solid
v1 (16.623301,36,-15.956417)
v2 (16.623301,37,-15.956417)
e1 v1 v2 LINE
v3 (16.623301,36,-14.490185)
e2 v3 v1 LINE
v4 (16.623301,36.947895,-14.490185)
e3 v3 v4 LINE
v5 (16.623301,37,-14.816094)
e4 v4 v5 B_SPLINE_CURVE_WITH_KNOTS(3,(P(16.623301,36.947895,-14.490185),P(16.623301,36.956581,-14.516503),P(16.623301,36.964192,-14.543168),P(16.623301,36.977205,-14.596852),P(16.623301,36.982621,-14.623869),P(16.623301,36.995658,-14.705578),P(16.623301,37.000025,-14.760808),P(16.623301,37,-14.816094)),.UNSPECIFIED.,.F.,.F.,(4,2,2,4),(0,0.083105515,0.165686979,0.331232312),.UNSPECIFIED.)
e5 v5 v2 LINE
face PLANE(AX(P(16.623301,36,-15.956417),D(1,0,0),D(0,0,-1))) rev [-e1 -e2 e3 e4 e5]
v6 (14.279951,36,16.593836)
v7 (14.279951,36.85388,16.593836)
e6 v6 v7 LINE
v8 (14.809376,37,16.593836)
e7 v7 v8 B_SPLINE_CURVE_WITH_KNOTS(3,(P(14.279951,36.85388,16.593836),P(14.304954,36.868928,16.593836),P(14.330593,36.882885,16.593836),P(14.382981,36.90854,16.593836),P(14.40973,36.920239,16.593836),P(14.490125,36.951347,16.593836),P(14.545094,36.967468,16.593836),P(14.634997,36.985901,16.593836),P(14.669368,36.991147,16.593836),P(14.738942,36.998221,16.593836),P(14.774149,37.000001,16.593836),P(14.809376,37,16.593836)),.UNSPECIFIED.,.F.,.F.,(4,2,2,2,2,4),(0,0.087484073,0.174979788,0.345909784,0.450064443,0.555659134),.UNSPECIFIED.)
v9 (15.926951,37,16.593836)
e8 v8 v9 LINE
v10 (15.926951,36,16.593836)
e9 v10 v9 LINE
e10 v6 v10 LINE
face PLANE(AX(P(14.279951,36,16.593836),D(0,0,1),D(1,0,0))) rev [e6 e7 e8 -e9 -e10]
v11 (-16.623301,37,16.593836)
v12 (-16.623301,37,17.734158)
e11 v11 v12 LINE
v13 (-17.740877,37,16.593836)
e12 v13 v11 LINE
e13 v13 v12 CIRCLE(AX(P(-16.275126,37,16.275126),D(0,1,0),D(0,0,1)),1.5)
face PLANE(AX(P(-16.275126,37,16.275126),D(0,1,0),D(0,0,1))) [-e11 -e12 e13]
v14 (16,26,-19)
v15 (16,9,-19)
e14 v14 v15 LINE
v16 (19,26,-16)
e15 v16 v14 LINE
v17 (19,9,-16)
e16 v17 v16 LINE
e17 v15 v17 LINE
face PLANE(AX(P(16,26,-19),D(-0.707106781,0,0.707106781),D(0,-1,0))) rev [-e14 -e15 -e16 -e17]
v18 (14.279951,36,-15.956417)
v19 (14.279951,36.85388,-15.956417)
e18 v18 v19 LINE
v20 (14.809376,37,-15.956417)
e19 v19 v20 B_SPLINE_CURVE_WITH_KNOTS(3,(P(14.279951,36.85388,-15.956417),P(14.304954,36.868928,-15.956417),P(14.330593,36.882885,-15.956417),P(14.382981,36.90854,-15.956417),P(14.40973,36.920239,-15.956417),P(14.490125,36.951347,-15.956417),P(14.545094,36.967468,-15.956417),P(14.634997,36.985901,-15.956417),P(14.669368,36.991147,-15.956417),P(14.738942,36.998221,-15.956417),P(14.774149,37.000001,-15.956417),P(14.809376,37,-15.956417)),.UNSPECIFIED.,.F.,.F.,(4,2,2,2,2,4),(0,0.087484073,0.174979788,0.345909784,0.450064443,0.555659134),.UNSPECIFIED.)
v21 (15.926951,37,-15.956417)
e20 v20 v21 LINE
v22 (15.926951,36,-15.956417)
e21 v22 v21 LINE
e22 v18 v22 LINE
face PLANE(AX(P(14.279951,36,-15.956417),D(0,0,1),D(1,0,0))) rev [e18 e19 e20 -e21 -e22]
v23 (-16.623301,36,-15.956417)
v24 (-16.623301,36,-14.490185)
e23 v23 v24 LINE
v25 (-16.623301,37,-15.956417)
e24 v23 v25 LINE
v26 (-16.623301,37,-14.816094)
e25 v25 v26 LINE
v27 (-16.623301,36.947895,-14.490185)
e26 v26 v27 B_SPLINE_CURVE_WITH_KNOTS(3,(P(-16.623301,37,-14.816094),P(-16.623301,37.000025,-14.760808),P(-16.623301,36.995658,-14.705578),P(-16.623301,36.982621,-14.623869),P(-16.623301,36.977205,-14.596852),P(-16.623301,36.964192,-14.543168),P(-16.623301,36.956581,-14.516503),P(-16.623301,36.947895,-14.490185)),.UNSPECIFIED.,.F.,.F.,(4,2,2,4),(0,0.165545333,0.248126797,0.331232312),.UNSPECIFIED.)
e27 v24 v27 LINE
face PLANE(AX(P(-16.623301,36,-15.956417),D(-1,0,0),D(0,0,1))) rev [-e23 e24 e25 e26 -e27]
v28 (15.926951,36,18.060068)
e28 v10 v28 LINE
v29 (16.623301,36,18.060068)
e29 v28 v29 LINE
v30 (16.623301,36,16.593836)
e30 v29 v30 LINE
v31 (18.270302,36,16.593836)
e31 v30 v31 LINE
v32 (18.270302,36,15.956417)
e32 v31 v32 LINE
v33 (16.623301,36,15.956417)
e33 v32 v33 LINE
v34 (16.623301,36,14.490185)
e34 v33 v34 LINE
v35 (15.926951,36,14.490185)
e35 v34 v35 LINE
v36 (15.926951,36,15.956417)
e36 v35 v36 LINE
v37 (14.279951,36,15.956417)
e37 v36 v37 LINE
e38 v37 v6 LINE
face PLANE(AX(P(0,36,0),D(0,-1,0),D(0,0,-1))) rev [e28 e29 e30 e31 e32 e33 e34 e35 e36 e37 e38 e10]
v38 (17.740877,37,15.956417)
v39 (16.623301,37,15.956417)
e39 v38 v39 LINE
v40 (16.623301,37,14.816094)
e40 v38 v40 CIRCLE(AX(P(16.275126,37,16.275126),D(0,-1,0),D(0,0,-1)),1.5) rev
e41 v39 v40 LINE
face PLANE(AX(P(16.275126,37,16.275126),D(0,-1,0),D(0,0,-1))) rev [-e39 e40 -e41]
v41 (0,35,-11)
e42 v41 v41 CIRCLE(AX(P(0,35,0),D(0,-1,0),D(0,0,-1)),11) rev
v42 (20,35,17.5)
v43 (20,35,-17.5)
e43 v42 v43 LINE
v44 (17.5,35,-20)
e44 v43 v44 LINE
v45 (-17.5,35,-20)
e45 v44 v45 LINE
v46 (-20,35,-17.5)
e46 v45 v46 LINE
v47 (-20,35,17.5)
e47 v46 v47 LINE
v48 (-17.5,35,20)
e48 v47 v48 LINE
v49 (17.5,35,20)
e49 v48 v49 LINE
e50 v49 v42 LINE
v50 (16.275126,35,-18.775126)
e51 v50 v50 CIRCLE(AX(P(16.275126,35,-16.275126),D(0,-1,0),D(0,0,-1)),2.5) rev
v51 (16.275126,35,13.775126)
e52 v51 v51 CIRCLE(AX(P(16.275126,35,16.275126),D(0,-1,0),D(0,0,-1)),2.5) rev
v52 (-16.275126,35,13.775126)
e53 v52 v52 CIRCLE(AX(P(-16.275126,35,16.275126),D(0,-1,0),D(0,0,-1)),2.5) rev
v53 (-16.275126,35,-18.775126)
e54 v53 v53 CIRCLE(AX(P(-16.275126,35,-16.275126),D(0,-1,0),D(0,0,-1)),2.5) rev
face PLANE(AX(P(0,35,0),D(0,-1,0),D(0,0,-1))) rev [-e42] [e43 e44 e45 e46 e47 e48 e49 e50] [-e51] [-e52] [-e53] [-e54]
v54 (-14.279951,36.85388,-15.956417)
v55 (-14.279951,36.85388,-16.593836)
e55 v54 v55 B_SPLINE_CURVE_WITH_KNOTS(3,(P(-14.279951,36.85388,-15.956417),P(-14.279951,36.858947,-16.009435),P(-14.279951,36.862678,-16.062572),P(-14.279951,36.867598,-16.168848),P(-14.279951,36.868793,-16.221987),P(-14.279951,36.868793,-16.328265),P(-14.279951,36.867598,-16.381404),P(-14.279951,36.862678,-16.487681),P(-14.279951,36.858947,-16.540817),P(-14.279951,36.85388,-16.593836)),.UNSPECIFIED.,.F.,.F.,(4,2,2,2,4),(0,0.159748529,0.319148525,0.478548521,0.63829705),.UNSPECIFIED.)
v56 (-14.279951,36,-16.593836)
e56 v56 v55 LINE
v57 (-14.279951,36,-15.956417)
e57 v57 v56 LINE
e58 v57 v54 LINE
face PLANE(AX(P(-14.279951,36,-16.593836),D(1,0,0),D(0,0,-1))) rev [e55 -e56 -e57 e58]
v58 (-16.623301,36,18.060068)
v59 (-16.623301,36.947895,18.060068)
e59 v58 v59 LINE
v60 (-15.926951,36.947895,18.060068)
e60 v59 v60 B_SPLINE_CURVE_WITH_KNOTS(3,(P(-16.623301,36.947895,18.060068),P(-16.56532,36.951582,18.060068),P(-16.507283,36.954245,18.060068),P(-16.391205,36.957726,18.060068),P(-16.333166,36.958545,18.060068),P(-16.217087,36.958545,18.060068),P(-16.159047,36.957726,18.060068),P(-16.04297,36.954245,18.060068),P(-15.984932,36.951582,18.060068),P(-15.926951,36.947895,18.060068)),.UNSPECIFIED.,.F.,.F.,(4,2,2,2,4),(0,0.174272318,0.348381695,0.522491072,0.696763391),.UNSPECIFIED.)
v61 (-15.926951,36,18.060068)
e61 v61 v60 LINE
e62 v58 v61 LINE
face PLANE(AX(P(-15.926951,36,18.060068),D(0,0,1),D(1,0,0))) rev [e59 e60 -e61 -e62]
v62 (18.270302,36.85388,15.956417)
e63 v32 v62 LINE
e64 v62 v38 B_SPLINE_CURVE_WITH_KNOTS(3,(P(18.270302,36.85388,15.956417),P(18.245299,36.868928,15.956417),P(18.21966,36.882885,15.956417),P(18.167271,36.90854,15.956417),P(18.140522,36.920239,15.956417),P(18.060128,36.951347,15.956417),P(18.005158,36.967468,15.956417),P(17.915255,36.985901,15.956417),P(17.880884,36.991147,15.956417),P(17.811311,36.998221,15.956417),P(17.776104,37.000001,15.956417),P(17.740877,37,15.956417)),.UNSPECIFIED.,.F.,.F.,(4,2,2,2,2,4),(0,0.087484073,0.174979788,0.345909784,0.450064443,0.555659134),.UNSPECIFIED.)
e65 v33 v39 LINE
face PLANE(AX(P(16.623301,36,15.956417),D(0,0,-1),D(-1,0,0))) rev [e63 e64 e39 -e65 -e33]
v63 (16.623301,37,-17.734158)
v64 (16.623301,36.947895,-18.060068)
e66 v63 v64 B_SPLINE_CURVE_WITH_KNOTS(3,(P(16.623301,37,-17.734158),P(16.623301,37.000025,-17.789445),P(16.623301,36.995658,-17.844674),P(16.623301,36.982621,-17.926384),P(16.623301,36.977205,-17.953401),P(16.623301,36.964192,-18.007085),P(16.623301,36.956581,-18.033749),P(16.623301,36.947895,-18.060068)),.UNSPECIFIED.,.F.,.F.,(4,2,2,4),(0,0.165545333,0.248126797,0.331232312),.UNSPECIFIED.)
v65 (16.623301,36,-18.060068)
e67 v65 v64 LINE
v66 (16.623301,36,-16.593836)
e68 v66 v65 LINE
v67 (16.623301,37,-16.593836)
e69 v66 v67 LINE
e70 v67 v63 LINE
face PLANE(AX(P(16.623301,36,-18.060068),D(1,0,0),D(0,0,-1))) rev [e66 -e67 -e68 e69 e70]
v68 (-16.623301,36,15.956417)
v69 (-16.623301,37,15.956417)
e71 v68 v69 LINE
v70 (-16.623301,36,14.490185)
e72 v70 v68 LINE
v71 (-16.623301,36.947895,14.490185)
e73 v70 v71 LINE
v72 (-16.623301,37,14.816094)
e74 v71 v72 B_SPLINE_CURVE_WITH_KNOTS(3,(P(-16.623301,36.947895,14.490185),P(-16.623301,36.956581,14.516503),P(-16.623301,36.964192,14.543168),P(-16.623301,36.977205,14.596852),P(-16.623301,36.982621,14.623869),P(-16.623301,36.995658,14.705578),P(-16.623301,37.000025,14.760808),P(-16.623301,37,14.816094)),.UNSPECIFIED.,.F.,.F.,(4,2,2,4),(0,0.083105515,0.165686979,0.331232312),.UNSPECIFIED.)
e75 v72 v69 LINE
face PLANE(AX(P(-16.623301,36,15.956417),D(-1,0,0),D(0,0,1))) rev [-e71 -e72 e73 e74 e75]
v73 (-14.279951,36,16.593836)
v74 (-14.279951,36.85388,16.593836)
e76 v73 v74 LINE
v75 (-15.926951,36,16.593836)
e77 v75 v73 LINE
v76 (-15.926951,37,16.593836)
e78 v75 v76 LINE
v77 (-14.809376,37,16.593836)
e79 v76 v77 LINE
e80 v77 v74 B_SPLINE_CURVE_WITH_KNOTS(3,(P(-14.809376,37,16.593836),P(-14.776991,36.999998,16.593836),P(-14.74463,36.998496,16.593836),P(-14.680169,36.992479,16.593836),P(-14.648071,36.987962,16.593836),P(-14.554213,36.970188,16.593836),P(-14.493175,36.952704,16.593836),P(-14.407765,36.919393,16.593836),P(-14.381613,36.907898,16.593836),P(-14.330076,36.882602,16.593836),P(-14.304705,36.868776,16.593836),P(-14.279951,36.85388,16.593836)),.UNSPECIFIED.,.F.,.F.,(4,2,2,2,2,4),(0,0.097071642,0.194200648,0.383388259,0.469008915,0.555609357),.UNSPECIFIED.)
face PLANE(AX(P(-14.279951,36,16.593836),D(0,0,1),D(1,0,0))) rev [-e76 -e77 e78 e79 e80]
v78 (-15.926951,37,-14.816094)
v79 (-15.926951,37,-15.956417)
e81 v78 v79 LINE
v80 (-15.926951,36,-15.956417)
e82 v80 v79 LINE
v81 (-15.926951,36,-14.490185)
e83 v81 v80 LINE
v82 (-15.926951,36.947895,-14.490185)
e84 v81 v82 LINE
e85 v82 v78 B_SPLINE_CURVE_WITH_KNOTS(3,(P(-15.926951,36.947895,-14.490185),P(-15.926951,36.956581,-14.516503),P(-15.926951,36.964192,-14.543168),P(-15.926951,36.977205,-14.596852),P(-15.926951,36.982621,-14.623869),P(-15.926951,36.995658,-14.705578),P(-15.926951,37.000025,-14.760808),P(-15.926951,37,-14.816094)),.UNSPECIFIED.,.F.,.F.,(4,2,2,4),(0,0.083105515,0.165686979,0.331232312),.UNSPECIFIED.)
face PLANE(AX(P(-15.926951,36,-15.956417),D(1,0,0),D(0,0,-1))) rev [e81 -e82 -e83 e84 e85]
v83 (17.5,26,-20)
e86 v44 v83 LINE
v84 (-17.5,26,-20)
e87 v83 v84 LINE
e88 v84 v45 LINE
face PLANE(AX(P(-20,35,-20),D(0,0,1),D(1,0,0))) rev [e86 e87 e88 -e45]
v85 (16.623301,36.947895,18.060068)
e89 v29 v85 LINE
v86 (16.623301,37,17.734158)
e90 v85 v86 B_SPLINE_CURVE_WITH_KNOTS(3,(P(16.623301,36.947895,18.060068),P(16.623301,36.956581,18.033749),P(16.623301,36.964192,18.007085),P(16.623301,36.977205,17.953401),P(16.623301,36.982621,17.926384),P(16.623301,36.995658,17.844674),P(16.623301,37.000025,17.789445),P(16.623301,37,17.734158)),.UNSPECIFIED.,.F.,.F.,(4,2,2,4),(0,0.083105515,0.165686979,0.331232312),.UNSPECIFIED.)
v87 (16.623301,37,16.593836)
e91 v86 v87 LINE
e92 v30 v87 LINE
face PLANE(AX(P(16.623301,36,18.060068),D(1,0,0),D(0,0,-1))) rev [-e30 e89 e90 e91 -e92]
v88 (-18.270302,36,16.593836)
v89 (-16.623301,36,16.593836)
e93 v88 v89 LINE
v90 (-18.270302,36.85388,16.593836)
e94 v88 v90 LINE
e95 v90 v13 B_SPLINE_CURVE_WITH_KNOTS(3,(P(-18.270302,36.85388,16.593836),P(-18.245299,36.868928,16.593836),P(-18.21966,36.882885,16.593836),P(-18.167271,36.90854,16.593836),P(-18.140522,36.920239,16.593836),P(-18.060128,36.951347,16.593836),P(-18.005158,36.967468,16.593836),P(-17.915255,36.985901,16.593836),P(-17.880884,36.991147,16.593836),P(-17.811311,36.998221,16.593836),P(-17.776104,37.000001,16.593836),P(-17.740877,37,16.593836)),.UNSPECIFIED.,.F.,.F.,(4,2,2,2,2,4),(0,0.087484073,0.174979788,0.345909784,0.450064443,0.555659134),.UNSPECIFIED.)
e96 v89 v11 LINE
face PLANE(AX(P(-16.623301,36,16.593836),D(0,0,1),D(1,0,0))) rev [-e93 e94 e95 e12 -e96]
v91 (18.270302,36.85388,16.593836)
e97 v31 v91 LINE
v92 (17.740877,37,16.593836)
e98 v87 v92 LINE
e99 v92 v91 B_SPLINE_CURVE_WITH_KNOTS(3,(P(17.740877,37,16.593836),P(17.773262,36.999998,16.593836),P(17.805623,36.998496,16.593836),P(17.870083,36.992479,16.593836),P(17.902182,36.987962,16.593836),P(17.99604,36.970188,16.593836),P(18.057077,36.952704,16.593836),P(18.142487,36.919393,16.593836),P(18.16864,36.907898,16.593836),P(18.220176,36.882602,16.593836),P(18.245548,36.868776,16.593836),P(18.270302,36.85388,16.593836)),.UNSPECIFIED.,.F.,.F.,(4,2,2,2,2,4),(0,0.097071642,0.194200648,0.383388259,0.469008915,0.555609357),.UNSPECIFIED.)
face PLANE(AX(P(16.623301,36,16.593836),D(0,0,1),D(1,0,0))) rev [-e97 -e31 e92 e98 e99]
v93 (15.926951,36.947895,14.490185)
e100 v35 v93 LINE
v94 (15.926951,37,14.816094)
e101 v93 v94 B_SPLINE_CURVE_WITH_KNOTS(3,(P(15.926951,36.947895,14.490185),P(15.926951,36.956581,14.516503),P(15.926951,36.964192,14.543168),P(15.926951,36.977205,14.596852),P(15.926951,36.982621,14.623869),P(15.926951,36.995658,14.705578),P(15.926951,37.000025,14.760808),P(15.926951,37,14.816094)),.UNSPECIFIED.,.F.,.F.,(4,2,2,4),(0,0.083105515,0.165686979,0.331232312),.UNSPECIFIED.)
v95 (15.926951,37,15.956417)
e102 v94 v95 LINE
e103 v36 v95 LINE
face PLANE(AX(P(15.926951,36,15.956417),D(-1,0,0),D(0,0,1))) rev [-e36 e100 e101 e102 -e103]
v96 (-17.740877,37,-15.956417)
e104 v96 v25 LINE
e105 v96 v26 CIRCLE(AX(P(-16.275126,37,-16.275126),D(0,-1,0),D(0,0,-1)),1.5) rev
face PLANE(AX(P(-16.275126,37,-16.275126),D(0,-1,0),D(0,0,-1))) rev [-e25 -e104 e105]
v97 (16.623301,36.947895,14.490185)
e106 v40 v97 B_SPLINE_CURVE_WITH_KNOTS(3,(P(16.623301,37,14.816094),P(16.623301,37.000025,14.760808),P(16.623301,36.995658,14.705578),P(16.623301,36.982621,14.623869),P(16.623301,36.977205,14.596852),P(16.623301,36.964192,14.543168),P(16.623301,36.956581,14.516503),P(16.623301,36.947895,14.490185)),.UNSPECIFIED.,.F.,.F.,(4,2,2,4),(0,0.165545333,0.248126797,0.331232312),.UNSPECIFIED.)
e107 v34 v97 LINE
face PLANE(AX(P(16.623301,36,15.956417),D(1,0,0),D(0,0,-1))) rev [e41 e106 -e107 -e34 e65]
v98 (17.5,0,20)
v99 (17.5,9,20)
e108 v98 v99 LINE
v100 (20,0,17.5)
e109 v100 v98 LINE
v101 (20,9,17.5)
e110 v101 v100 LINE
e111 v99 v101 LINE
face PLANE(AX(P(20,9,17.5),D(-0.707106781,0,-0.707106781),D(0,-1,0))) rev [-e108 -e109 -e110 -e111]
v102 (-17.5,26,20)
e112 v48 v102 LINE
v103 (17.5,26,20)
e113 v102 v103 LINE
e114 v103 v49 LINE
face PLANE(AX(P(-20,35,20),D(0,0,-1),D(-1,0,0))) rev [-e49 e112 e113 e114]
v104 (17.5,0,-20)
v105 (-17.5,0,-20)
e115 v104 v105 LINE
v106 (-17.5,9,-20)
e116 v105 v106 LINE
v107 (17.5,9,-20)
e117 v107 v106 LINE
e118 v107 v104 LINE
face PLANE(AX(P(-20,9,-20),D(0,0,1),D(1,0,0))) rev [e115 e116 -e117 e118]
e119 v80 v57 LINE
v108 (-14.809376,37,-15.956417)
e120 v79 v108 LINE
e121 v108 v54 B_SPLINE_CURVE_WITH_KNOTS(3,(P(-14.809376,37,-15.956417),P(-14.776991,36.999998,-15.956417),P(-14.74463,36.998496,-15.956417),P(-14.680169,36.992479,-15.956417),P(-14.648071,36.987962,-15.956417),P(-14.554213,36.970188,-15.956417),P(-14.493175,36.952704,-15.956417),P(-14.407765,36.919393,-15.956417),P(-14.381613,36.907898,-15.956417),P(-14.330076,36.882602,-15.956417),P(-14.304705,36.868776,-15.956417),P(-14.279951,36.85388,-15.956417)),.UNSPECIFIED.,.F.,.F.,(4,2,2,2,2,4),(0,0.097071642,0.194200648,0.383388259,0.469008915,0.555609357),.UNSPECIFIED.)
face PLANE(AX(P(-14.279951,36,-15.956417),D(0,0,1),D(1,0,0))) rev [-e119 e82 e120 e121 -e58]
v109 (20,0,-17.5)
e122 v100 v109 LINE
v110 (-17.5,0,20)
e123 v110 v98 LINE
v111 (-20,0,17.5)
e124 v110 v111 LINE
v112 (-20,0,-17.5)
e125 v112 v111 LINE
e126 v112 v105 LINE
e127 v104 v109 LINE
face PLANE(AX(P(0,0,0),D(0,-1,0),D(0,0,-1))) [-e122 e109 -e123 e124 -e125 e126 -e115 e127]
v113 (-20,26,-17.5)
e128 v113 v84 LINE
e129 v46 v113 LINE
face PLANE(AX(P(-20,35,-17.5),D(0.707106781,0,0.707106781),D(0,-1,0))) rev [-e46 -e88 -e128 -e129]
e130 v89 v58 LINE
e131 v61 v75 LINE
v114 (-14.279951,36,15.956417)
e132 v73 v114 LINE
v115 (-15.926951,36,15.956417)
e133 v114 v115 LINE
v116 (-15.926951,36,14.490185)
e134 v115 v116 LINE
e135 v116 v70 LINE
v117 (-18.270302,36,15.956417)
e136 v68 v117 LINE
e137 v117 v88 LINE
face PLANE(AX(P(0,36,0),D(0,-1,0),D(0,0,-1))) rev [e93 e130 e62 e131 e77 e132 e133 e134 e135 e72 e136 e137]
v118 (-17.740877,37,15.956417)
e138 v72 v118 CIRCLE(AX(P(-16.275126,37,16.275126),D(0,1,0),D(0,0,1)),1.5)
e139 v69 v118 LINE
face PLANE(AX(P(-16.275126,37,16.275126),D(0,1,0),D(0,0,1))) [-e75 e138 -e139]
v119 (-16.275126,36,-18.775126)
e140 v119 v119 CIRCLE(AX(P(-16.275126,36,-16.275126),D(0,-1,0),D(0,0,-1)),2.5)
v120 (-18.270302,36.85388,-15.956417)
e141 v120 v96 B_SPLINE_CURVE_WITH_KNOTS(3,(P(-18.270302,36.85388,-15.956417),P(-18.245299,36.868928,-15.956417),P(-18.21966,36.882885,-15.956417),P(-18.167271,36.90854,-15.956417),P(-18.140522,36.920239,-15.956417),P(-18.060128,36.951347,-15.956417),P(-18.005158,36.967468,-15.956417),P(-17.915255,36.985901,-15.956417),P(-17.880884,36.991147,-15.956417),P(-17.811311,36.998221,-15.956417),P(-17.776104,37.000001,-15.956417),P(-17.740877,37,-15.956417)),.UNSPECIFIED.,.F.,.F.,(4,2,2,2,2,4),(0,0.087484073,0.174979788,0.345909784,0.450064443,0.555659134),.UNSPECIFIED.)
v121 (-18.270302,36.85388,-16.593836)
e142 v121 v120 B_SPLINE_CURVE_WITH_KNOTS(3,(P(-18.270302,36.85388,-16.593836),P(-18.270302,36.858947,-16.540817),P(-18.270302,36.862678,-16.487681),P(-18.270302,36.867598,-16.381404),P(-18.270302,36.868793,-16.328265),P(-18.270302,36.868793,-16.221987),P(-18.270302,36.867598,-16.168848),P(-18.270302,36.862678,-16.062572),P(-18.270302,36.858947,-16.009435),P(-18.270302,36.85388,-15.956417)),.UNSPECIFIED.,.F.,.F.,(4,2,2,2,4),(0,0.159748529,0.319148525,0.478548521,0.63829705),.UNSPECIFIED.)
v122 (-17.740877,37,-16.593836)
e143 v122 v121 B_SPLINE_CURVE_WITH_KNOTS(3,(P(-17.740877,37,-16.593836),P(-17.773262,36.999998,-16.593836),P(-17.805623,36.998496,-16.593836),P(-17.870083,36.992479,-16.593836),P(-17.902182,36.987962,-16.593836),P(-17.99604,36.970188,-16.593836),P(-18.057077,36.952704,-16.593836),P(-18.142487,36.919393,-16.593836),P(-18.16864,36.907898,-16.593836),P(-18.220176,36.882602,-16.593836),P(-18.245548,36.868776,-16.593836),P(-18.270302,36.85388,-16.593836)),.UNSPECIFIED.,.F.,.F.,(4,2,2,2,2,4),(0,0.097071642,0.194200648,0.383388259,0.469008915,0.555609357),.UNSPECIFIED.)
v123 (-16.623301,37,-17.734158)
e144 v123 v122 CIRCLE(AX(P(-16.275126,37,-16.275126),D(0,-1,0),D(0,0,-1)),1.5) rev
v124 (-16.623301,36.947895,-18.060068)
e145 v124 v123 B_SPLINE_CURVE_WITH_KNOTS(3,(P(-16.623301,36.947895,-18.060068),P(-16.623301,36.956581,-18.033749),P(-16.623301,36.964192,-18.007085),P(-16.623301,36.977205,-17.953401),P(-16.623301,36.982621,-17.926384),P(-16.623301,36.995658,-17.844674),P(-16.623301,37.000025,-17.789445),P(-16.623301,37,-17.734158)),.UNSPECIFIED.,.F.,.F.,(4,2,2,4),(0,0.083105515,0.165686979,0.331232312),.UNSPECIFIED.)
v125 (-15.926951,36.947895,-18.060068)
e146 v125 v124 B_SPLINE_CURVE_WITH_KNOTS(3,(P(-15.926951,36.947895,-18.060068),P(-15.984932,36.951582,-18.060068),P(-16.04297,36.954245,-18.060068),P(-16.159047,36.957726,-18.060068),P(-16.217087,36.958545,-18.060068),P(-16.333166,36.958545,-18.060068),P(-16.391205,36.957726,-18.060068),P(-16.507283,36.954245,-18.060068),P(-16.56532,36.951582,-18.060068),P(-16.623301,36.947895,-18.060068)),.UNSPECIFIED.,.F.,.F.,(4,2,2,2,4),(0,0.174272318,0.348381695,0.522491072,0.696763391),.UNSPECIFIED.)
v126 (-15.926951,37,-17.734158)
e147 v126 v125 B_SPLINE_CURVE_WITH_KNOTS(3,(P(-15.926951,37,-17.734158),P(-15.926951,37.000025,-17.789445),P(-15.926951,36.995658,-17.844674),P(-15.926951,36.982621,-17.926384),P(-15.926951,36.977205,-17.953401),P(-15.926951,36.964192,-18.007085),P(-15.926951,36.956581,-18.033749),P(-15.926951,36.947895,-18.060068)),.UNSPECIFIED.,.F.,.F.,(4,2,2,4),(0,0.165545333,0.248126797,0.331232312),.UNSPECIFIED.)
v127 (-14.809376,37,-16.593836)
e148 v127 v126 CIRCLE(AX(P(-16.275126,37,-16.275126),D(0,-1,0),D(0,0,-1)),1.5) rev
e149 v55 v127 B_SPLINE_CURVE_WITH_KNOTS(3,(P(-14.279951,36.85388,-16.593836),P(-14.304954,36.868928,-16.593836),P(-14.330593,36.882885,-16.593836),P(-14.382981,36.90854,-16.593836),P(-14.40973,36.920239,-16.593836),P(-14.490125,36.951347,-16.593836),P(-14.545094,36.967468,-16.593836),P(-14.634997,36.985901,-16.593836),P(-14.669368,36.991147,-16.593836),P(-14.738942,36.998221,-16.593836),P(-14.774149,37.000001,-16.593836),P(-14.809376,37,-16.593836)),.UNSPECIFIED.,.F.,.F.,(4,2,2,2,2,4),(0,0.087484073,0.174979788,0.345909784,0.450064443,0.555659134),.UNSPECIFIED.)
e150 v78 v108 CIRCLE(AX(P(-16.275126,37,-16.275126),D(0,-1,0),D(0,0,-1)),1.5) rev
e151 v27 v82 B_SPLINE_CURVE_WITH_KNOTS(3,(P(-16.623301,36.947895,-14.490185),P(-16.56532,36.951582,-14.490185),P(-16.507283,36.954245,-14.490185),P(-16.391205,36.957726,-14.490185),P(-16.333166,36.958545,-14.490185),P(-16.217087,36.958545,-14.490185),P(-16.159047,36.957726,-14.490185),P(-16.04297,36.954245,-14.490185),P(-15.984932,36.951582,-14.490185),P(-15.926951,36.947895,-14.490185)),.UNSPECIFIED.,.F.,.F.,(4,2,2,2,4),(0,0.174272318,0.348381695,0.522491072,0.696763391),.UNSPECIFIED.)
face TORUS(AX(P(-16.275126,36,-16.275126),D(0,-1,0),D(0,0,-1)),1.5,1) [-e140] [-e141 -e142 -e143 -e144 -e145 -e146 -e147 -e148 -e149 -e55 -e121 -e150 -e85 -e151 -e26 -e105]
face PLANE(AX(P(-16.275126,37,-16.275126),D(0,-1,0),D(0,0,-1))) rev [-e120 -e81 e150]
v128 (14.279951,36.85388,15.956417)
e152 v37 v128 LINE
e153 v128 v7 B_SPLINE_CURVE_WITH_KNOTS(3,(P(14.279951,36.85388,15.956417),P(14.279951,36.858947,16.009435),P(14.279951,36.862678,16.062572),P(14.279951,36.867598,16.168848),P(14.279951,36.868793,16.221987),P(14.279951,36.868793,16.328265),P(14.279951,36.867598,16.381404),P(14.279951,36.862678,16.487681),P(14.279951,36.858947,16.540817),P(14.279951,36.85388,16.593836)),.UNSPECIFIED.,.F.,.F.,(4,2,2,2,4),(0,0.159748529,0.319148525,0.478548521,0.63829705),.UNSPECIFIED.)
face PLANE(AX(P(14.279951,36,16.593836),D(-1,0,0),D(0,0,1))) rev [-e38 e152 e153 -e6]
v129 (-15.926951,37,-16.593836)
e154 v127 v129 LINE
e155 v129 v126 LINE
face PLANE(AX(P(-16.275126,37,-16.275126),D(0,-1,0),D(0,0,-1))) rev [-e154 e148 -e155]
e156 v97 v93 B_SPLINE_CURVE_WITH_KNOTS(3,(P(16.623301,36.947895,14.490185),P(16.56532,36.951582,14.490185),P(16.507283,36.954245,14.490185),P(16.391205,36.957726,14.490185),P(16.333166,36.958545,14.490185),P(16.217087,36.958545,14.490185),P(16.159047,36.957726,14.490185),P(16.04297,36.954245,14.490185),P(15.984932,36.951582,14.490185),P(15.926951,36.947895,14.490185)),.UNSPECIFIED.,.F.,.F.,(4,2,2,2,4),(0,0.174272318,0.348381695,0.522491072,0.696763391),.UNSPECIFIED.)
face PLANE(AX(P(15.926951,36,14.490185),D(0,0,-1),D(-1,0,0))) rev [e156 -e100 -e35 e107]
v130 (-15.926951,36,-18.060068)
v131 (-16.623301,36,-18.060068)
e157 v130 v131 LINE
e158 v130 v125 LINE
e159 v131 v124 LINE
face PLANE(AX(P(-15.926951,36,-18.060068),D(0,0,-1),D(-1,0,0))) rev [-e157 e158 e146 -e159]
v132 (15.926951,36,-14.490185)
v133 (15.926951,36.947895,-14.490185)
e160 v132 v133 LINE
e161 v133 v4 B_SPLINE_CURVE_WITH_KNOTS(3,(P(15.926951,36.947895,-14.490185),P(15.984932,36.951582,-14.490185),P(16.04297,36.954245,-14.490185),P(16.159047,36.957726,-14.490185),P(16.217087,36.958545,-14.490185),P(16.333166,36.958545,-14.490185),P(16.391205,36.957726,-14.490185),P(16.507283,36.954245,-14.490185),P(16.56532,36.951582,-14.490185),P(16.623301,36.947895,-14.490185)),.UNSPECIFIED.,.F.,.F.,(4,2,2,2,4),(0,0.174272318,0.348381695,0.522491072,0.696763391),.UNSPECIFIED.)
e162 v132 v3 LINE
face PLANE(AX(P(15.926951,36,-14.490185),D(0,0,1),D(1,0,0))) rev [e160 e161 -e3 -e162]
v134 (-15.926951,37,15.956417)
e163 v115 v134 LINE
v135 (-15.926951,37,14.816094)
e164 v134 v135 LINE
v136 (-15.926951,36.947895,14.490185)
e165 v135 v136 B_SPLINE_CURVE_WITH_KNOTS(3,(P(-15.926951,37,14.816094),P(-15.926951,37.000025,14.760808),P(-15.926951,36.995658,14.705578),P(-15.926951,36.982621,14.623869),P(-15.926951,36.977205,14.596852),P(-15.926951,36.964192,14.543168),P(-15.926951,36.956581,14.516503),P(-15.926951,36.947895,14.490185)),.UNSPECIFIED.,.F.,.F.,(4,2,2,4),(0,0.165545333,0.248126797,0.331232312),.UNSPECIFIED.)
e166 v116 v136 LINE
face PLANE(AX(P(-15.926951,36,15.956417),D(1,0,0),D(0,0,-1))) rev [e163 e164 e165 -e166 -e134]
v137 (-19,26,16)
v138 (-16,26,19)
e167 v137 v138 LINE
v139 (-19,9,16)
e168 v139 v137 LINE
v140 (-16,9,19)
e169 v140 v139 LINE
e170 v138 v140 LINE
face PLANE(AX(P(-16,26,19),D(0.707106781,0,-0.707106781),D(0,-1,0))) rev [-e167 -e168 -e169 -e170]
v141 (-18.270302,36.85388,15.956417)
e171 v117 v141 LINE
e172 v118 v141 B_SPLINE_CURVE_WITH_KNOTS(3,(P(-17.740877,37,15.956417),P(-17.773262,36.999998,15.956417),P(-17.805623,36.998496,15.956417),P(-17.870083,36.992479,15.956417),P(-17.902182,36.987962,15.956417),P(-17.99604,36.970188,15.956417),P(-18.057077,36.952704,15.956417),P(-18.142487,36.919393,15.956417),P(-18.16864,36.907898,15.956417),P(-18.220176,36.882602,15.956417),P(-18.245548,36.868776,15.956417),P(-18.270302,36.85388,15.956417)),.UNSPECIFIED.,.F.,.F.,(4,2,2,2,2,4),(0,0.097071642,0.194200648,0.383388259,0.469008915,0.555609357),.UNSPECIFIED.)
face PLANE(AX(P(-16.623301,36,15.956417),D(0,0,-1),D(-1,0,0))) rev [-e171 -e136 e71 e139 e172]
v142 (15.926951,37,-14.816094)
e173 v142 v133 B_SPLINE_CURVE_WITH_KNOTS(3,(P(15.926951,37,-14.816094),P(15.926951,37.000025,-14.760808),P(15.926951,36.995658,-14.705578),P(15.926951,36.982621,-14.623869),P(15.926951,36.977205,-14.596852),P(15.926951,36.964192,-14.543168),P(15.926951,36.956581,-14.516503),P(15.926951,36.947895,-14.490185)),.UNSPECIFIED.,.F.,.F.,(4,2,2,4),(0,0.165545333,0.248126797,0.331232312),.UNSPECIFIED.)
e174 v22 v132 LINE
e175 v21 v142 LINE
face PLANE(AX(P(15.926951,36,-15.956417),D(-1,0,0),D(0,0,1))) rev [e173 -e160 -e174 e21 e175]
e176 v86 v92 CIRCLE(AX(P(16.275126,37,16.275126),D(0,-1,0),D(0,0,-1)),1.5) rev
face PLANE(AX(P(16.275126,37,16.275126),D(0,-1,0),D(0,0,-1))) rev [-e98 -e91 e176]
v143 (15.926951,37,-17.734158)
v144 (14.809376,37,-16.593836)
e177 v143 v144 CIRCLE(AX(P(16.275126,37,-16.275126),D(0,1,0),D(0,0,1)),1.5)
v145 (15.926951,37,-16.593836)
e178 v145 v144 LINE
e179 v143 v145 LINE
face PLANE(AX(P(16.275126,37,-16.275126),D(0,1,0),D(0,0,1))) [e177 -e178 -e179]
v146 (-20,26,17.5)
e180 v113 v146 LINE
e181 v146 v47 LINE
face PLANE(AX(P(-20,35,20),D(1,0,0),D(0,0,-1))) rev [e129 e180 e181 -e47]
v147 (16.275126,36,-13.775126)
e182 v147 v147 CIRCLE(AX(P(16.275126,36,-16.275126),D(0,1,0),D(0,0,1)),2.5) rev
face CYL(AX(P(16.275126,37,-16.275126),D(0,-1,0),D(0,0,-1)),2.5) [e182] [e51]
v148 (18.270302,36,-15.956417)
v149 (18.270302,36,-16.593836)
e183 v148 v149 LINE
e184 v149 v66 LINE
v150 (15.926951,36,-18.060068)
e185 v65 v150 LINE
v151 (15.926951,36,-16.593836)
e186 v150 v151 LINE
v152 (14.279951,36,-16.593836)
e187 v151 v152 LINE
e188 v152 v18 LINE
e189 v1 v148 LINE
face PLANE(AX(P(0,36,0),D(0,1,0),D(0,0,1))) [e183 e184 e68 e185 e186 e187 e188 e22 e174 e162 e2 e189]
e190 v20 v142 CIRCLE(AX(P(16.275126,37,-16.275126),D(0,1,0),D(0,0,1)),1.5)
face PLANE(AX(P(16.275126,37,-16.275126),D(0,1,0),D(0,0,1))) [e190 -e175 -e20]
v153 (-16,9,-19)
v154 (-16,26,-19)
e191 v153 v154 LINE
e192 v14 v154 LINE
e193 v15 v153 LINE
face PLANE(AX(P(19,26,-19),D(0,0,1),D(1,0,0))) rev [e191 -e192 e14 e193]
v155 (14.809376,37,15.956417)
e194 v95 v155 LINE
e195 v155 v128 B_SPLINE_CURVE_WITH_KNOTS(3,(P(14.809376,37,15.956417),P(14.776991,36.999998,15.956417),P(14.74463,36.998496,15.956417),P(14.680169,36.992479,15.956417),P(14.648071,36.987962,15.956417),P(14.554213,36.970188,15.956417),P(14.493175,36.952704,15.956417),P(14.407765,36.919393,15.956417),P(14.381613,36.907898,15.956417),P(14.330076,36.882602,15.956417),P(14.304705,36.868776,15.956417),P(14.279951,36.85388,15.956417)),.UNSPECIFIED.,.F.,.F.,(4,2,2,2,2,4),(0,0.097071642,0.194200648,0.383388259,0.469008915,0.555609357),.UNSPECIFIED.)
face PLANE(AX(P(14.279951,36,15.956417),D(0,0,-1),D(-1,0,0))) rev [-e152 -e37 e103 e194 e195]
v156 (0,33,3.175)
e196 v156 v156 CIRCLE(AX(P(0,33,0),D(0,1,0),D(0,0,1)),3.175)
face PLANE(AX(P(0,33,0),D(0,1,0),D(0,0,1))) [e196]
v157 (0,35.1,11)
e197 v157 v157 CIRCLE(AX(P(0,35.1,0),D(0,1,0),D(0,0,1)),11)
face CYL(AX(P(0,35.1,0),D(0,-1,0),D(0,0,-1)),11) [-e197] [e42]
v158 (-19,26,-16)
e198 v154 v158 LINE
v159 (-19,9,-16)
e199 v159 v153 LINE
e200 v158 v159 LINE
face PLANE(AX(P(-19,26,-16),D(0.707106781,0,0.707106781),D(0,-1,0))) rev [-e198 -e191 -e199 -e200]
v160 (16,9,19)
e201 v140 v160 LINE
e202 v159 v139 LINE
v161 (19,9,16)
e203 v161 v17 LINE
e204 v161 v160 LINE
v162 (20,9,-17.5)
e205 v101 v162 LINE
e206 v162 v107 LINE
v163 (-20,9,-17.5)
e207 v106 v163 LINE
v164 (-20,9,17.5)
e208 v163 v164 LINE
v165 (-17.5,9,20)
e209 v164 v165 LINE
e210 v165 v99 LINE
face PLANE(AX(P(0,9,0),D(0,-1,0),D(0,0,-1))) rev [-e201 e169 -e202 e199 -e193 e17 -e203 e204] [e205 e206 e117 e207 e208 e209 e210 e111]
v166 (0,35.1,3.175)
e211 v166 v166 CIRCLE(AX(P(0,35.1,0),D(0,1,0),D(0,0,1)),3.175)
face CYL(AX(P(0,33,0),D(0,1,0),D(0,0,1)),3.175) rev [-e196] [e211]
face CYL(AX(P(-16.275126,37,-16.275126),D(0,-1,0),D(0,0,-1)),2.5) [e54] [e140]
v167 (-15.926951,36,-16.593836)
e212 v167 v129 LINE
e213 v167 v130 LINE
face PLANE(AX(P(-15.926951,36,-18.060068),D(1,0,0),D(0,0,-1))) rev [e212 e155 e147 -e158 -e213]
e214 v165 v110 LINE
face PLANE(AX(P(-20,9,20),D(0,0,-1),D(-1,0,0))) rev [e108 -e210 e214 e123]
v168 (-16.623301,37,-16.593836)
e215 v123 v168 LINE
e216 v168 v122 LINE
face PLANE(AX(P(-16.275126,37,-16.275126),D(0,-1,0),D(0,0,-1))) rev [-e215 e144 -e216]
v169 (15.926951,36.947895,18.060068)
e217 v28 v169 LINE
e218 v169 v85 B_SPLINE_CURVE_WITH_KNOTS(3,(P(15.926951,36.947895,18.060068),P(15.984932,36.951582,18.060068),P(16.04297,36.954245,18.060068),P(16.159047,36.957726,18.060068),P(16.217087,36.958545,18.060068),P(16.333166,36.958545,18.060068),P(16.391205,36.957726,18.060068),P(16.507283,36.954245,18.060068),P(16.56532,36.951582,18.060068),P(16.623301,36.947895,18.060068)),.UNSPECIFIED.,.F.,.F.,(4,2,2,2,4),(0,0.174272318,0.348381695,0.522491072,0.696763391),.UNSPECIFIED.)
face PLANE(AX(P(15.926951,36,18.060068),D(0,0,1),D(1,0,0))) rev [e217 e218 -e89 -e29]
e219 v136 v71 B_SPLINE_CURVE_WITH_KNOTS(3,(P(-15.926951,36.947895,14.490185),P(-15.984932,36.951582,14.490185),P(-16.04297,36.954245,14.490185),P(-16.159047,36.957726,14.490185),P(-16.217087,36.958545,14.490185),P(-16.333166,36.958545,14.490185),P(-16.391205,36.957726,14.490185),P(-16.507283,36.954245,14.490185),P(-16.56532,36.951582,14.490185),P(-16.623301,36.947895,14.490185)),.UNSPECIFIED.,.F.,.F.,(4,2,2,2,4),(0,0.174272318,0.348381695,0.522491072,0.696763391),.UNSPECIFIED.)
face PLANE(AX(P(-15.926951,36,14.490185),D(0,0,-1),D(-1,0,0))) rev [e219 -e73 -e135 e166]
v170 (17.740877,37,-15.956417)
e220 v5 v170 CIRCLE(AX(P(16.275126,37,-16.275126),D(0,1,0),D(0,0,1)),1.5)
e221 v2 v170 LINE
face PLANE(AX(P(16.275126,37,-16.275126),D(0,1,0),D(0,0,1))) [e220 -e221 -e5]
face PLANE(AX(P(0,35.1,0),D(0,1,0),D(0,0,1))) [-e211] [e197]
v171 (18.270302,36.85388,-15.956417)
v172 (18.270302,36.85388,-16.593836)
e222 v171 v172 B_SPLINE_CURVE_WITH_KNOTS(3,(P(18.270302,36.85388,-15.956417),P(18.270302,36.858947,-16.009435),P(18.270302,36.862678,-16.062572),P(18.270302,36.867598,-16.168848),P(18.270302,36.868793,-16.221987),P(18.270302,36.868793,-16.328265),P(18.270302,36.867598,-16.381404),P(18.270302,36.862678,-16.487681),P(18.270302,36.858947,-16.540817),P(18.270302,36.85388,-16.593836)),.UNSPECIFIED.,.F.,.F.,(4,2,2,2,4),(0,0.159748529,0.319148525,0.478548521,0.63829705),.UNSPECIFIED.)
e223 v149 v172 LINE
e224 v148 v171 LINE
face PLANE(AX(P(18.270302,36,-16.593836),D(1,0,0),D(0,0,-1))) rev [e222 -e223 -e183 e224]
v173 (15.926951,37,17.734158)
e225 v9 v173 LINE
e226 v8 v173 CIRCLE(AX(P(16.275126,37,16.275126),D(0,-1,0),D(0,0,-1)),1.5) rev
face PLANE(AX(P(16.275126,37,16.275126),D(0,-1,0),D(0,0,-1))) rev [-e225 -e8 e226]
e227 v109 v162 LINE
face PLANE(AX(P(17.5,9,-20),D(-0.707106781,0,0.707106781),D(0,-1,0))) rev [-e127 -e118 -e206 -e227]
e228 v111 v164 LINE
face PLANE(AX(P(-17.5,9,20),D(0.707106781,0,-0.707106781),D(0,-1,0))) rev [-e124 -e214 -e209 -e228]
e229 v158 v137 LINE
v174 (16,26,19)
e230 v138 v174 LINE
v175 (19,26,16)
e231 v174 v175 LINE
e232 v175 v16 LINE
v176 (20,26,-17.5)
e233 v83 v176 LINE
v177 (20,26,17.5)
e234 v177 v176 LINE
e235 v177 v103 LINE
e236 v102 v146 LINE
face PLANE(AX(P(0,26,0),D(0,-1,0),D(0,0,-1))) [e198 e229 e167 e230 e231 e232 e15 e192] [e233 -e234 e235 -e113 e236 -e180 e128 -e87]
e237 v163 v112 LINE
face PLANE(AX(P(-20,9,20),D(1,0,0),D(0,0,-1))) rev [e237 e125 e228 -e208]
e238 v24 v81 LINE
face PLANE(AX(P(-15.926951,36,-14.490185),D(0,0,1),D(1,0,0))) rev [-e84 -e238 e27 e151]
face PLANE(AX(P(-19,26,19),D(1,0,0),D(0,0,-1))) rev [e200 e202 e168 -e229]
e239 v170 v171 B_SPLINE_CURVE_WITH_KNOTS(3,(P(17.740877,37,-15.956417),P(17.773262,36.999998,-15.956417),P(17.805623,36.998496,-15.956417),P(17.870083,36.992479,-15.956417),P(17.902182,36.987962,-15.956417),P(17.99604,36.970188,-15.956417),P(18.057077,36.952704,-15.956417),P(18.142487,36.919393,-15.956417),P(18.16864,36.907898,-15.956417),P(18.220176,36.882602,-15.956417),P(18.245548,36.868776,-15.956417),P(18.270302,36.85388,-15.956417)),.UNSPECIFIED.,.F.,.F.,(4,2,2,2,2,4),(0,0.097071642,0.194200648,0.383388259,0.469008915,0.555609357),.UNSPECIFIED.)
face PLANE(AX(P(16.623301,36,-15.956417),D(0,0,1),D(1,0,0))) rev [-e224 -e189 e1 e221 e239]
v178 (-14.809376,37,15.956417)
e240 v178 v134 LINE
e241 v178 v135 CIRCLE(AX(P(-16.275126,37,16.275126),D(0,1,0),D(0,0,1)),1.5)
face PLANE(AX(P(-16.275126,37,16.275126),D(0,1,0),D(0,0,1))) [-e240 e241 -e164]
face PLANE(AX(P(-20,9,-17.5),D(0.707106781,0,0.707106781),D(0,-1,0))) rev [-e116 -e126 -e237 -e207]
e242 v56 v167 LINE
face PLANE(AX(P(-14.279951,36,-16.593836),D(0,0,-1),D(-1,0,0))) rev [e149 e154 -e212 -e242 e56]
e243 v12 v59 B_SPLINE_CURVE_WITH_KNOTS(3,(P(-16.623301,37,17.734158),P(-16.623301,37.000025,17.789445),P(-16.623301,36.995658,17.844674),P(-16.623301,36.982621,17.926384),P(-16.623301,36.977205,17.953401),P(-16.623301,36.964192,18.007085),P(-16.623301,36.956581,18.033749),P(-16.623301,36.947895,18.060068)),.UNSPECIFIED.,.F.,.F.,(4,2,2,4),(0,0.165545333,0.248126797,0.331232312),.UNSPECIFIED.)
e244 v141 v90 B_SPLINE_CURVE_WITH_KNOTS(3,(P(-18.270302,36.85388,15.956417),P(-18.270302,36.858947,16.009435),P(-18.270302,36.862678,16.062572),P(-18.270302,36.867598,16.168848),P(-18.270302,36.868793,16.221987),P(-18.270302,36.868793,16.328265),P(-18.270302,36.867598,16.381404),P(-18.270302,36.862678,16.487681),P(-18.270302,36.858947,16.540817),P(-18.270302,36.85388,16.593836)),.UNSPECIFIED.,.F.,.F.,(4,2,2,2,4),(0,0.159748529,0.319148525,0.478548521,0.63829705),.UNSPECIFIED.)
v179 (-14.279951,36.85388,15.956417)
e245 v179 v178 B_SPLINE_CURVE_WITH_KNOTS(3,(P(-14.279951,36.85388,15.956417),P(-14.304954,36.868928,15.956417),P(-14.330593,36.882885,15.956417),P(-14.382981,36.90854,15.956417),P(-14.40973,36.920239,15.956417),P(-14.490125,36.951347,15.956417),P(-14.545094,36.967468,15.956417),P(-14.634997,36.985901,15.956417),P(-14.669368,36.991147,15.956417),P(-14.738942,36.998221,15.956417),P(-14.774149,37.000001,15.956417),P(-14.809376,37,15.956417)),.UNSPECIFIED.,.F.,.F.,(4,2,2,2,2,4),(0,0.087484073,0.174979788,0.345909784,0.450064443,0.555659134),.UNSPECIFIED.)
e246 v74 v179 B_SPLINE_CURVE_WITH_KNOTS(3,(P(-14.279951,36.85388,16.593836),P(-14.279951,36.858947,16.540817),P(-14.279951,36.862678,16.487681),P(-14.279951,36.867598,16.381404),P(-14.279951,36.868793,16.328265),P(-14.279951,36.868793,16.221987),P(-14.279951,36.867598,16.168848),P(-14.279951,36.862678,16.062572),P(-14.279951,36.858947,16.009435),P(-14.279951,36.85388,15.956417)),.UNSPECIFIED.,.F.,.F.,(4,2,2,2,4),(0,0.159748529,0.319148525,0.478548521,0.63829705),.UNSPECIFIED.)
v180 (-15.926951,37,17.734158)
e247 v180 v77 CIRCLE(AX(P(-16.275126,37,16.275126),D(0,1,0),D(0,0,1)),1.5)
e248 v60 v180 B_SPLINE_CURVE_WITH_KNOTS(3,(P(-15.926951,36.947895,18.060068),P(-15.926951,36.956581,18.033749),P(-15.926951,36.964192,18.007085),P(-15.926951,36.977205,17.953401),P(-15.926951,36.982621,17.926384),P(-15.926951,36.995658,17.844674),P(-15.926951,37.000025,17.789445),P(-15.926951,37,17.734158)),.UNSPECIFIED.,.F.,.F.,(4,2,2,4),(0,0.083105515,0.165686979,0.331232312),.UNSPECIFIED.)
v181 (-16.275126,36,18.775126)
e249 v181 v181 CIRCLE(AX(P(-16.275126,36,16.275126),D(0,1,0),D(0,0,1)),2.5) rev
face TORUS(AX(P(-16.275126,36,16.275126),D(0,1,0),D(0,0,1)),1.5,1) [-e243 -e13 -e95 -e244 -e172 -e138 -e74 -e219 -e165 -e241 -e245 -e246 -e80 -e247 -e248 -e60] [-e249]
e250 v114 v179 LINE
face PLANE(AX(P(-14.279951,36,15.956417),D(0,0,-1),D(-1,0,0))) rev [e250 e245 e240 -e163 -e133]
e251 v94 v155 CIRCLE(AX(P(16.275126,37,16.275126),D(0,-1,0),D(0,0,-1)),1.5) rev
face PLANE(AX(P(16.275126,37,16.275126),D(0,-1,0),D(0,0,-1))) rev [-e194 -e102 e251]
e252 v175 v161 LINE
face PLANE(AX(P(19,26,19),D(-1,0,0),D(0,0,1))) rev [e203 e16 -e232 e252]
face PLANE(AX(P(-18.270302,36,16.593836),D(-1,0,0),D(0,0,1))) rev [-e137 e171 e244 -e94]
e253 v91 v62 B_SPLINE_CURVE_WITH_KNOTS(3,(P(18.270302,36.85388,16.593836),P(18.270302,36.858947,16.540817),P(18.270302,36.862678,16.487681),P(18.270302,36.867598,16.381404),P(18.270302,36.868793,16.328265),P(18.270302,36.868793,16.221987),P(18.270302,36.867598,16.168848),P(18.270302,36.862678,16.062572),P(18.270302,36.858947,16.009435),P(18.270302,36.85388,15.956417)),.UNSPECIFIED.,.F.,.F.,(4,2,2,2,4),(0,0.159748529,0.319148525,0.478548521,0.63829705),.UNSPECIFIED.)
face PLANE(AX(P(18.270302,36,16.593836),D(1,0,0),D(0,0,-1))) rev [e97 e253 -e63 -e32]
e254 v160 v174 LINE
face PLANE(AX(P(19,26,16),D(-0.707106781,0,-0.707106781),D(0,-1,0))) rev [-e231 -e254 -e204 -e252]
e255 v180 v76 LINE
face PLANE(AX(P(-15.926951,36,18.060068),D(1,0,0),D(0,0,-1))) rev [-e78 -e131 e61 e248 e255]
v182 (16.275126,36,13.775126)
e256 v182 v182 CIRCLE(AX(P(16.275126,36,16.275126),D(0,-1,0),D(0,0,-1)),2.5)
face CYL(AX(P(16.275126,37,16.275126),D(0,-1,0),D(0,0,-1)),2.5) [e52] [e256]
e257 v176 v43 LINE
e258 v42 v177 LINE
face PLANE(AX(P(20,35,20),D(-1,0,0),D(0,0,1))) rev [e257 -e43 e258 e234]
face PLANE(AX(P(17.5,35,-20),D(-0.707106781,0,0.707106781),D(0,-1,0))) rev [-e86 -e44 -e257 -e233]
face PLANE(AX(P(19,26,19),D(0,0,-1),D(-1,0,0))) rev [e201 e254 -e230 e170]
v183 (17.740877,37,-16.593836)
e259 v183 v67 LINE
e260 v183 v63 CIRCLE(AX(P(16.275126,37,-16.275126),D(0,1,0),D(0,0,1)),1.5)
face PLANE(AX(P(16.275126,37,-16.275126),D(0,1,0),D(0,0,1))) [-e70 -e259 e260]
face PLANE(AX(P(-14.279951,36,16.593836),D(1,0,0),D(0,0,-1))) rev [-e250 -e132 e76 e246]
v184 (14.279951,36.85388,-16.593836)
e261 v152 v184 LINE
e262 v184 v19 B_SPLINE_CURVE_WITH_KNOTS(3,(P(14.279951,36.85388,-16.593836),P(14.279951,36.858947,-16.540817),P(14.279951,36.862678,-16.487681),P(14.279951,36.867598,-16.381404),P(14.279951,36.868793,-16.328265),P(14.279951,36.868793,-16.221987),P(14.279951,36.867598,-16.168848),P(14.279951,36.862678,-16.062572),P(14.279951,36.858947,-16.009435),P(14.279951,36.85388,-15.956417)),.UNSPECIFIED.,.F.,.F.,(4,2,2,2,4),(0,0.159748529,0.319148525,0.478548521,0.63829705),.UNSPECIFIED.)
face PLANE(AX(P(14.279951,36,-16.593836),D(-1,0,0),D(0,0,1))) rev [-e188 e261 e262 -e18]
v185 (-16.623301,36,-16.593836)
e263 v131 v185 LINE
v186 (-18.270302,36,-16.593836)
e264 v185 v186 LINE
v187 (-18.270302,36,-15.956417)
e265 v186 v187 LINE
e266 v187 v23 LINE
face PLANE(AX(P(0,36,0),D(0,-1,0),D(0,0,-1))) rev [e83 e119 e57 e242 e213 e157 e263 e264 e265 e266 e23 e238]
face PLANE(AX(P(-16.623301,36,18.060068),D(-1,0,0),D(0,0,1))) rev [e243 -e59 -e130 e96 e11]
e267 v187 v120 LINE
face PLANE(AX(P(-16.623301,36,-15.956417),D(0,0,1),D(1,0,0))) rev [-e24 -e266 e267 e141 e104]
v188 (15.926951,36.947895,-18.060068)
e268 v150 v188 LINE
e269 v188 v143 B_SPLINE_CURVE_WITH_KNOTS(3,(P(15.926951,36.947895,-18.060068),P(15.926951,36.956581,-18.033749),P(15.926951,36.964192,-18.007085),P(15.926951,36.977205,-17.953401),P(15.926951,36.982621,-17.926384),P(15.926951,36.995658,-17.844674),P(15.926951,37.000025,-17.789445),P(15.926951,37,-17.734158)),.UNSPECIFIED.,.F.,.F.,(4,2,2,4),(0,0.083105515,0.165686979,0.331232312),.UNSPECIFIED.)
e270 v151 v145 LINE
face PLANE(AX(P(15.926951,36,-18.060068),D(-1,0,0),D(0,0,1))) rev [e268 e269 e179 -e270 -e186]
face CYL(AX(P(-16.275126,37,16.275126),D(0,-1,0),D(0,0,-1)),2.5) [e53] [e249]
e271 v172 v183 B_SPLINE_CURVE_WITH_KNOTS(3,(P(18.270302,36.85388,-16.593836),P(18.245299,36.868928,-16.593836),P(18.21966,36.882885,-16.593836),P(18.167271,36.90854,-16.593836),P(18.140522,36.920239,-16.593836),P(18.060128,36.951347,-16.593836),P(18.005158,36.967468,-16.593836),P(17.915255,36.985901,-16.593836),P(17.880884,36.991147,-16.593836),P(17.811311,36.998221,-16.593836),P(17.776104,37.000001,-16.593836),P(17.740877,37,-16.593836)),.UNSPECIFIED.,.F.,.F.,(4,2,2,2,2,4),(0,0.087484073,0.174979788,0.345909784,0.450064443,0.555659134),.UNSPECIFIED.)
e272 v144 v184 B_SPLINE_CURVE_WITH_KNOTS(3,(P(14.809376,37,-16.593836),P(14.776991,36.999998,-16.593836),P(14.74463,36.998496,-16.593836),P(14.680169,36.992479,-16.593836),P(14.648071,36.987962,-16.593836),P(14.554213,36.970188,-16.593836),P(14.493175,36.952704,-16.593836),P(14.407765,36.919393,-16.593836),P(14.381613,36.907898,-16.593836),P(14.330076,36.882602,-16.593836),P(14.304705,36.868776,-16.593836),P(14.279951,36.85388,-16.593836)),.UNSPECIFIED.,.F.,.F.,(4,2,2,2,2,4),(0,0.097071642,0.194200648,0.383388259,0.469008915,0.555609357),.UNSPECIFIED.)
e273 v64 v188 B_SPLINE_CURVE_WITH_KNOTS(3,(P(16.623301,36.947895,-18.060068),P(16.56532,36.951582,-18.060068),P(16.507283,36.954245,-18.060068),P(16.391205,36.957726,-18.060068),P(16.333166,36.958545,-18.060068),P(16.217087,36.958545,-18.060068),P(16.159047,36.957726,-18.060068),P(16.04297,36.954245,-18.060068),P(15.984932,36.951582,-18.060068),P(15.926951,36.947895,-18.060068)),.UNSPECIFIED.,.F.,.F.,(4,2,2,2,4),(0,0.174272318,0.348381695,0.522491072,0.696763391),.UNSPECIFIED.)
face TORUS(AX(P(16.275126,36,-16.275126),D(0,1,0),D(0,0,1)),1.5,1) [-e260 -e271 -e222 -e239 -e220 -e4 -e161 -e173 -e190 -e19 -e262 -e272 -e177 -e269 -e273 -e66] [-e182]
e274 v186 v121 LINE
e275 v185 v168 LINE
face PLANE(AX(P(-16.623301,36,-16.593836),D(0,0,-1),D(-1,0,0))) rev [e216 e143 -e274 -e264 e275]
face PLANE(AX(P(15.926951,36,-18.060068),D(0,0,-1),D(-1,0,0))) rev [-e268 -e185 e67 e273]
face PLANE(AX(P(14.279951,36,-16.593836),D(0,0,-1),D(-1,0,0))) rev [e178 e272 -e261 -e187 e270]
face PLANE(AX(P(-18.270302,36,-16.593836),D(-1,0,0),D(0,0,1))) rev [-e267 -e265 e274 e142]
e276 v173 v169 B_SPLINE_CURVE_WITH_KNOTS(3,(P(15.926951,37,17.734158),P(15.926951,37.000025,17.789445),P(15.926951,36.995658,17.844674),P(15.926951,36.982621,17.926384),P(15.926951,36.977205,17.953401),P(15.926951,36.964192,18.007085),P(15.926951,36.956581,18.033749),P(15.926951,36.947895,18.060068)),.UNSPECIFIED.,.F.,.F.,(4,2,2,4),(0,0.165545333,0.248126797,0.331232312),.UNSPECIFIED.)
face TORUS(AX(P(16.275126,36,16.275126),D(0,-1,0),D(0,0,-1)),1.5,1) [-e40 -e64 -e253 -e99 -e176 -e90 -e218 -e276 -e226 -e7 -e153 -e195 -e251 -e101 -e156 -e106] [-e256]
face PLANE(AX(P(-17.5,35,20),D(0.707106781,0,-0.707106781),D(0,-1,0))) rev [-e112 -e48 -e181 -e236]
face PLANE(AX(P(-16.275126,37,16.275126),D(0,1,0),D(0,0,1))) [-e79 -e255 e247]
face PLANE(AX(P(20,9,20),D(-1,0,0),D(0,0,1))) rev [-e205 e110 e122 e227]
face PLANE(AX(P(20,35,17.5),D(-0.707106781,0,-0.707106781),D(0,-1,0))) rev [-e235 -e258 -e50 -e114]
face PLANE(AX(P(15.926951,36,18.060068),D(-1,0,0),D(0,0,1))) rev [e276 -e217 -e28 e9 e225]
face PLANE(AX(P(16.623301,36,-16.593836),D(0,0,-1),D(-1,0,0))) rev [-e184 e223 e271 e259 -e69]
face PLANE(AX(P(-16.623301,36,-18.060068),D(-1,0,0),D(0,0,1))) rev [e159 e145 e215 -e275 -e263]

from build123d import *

# Parameters (mm, degrees)
CROQUIS1_W              = 40
CROQUIS1_H              = 40
SALIENTE_EXTRUIR1_DEPTH = 9
CROQUIS2_W              = 38
CROQUIS2_H              = 38
SALIENTE_EXTRUIR2_DEPTH = 17
CROQUIS3_W              = 40
CROQUIS3_H              = 40
SALIENTE_EXTRUIR3_DEPTH = 9
CHAFL_N1_SIZE           = 3
CHAFL_N2_SIZE           = 2.5
CROQUIS4_R              = 3.175
CORTAR_EXTRUIR1_DEPTH   = 2
SALIENTE_EXTRUIR4_START = 0.1
CROQUIS5_R              = 11
CROQUIS5_R_2            = 3.175
SALIENTE_EXTRUIR4_DEPTH = 0.1
CROQUIS6_R              = 2.5
SALIENTE_EXTRUIR5_DEPTH = 2
CORTAR_EXTRUIR2_DEPTH   = 1
REDONDEO1_R             = 1


with BuildPart() as part:
    # Croquis1 → Saliente-Extruir1 (new body)
    with BuildSketch(Plane(origin=(0, 0, 0), x_dir=(1, 0, 0), z_dir=(0, 1, 0))):
        Rectangle(CROQUIS1_W, CROQUIS1_H)
    extrude(amount=SALIENTE_EXTRUIR1_DEPTH)

    # Croquis2 → Saliente-Extruir2 (add)
    with BuildSketch(Plane(origin=(0, 9, 0), x_dir=(1, 0, 0), z_dir=(0, 1, 0))):
        Rectangle(CROQUIS2_W, CROQUIS2_H)
    extrude(amount=SALIENTE_EXTRUIR2_DEPTH)

    # Croquis3 → Saliente-Extruir3 (add)
    with BuildSketch(Plane(origin=(0, 26, 0), x_dir=(1, 0, 0), z_dir=(0, 1, 0))):
        Rectangle(CROQUIS3_W, CROQUIS3_H)
    extrude(amount=SALIENTE_EXTRUIR3_DEPTH)

    # Chaflán1
    chafl_n1_edges = [part.edges().sort_by_distance(p)[0] for p in [
        (-19, 17.5, -19),
        (-19, 17.5, 19),
        (19, 17.5, 19),
        (19, 17.5, -19),
    ]]
    chamfer(chafl_n1_edges, length=CHAFL_N1_SIZE)

    # Chaflán2
    chafl_n2_edges = [part.edges().sort_by_distance(p)[0] for p in [
        (-20, 30.5, -20),
        (-20, 30.5, 20),
        (20, 30.5, 20),
        (20, 30.5, -20),
        (20, 4.5, 20),
        (-20, 4.5, 20),
        (-20, 4.5, -20),
        (20, 4.5, -20),
    ]]
    chamfer(chafl_n2_edges, length=CHAFL_N2_SIZE)

    # Croquis4 → Cortar-Extruir1 (cut)
    with BuildSketch(Plane(origin=(0, 35, 0), x_dir=(1, 0, 0), z_dir=(0, 1, 0))):
        with Locations(Location((0, 0, 0), (0, 0, 270))):
            Circle(CROQUIS4_R)
    extrude(amount=-CORTAR_EXTRUIR1_DEPTH, mode=Mode.SUBTRACT)

    # Croquis5 → Saliente-Extruir4 (add)
    with BuildSketch(Plane(origin=(0, 35, 0), x_dir=(1, 0, 0), z_dir=(0, 1, 0)).offset(SALIENTE_EXTRUIR4_START)):
        with Locations(Location((0, 0, 0), (0, 0, 90))):
            Circle(CROQUIS5_R)
        with Locations(Location((0, 0, 0), (0, 0, 270))):
            Circle(CROQUIS5_R_2, mode=Mode.SUBTRACT)
    extrude(amount=-SALIENTE_EXTRUIR4_DEPTH)

    # Croquis6 → Saliente-Extruir5 (add)
    with BuildSketch(Plane(origin=(0, 35, 0), x_dir=(1, 0, 0), z_dir=(0, 1, 0))):
        with Locations(Location((-16.275126266, -16.275126266, 0), (0, 0, 90))):
            Circle(CROQUIS6_R)
        with Locations(Location((-16.275126266, 16.275126266, 0), (0, 0, 90))):
            Circle(CROQUIS6_R)
        with Locations(Location((16.275126266, 16.275126266, 0), (0, 0, 90))):
            Circle(CROQUIS6_R)
        with Locations(Location((16.275126266, -16.275126266, 0), (0, 0, 90))):
            Circle(CROQUIS6_R)
    extrude(amount=SALIENTE_EXTRUIR5_DEPTH)

    # Croquis7 → Cortar-Extruir2 (cut)
    with BuildSketch(Plane(origin=(0, 37, 0), x_dir=(1, 0, 0), z_dir=(0, 1, 0))):
        Polygon((-15.926951302, -15.956416982), (-15.926951302, -14.490184749), (-16.62330123, -14.490184749), (-16.62330123, -15.956416982), (-18.27030182, -15.956416982), (-18.27030182, -16.593835549), (-16.62330123, -16.593835549), (-16.62330123, -18.060067782), (-15.926951302, -18.060067782), (-15.926951302, -16.593835549), (-14.279950711, -16.593835549), (-14.279950711, -15.956416982), align=None)
        Polygon((-16.62330123, 15.956416982), (-18.27030182, 15.956416982), (-18.27030182, 16.593835549), (-16.62330123, 16.593835549), (-16.62330123, 18.060067782), (-15.926951302, 18.060067782), (-15.926951302, 16.593835549), (-14.279950711, 16.593835549), (-14.279950711, 15.956416982), (-15.926951302, 15.956416982), (-15.926951302, 14.490184749), (-16.62330123, 14.490184749), align=None)
        Polygon((15.926951302, 15.956416982), (15.926951302, 14.490184749), (16.62330123, 14.490184749), (16.62330123, 15.956416982), (18.27030182, 15.956416982), (18.27030182, 16.593835549), (16.62330123, 16.593835549), (16.62330123, 18.060067782), (15.926951302, 18.060067782), (15.926951302, 16.593835549), (14.279950711, 16.593835549), (14.279950711, 15.956416982), align=None)
        Polygon((16.62330123, -15.956416982), (18.27030182, -15.956416982), (18.27030182, -16.593835549), (16.62330123, -16.593835549), (16.62330123, -18.060067782), (15.926951302, -18.060067782), (15.926951302, -16.593835549), (14.279950711, -16.593835549), (14.279950711, -15.956416982), (15.926951302, -15.956416982), (15.926951302, -14.490184749), (16.62330123, -14.490184749), align=None)
    extrude(amount=-CORTAR_EXTRUIR2_DEPTH, mode=Mode.SUBTRACT)

    # Redondeo1
    # the kernel refuses this fillet: 1 mm, written as the material it takes off along each edge
    with BuildSketch(Plane(origin=(16.275126266, 37, -16.275126266), x_dir=(0, 0, -1), z_dir=(1, 0, 0))) as redondeo1_piece_1:
        with BuildLine():
            CenterArc((2.5 - REDONDEO1_R, -REDONDEO1_R), REDONDEO1_R, 0, 90)
            Line((2.5 - REDONDEO1_R, 0), (2.5, 0))
            Line((2.5, 0), (2.5, -REDONDEO1_R))
        make_face()
    revolve(axis=Axis((16.275126266, 37, -16.275126266), (0, 1, 0)), mode=Mode.SUBTRACT)
    with BuildSketch(Plane(origin=(16.275126266, 37, 16.275126266), x_dir=(0, 0, -1), z_dir=(1, 0, 0))) as redondeo1_piece_2:
        with BuildLine():
            CenterArc((2.5 - REDONDEO1_R, -REDONDEO1_R), REDONDEO1_R, 0, 90)
            Line((2.5 - REDONDEO1_R, 0), (2.5, 0))
            Line((2.5, 0), (2.5, -REDONDEO1_R))
        make_face()
    revolve(axis=Axis((16.275126266, 37, 16.275126266), (0, 1, 0)), mode=Mode.SUBTRACT)
    with BuildSketch(Plane(origin=(-16.275126266, 37, -16.275126266), x_dir=(0, 0, -1), z_dir=(1, 0, 0))) as redondeo1_piece_3:
        with BuildLine():
            CenterArc((2.5 - REDONDEO1_R, -REDONDEO1_R), REDONDEO1_R, 0, 90)
            Line((2.5 - REDONDEO1_R, 0), (2.5, 0))
            Line((2.5, 0), (2.5, -REDONDEO1_R))
        make_face()
    revolve(axis=Axis((-16.275126266, 37, -16.275126266), (0, 1, 0)), mode=Mode.SUBTRACT)
    with BuildSketch(Plane(origin=(-16.275126266, 37, 16.275126266), x_dir=(0, 0, -1), z_dir=(1, 0, 0))) as redondeo1_piece_4:
        with BuildLine():
            CenterArc((2.5 - REDONDEO1_R, -REDONDEO1_R), REDONDEO1_R, 0, 90)
            Line((2.5 - REDONDEO1_R, 0), (2.5, 0))
            Line((2.5, 0), (2.5, -REDONDEO1_R))
        make_face()
    revolve(axis=Axis((-16.275126266, 37, 16.275126266), (0, 1, 0)), mode=Mode.SUBTRACT)


solid = part.part
